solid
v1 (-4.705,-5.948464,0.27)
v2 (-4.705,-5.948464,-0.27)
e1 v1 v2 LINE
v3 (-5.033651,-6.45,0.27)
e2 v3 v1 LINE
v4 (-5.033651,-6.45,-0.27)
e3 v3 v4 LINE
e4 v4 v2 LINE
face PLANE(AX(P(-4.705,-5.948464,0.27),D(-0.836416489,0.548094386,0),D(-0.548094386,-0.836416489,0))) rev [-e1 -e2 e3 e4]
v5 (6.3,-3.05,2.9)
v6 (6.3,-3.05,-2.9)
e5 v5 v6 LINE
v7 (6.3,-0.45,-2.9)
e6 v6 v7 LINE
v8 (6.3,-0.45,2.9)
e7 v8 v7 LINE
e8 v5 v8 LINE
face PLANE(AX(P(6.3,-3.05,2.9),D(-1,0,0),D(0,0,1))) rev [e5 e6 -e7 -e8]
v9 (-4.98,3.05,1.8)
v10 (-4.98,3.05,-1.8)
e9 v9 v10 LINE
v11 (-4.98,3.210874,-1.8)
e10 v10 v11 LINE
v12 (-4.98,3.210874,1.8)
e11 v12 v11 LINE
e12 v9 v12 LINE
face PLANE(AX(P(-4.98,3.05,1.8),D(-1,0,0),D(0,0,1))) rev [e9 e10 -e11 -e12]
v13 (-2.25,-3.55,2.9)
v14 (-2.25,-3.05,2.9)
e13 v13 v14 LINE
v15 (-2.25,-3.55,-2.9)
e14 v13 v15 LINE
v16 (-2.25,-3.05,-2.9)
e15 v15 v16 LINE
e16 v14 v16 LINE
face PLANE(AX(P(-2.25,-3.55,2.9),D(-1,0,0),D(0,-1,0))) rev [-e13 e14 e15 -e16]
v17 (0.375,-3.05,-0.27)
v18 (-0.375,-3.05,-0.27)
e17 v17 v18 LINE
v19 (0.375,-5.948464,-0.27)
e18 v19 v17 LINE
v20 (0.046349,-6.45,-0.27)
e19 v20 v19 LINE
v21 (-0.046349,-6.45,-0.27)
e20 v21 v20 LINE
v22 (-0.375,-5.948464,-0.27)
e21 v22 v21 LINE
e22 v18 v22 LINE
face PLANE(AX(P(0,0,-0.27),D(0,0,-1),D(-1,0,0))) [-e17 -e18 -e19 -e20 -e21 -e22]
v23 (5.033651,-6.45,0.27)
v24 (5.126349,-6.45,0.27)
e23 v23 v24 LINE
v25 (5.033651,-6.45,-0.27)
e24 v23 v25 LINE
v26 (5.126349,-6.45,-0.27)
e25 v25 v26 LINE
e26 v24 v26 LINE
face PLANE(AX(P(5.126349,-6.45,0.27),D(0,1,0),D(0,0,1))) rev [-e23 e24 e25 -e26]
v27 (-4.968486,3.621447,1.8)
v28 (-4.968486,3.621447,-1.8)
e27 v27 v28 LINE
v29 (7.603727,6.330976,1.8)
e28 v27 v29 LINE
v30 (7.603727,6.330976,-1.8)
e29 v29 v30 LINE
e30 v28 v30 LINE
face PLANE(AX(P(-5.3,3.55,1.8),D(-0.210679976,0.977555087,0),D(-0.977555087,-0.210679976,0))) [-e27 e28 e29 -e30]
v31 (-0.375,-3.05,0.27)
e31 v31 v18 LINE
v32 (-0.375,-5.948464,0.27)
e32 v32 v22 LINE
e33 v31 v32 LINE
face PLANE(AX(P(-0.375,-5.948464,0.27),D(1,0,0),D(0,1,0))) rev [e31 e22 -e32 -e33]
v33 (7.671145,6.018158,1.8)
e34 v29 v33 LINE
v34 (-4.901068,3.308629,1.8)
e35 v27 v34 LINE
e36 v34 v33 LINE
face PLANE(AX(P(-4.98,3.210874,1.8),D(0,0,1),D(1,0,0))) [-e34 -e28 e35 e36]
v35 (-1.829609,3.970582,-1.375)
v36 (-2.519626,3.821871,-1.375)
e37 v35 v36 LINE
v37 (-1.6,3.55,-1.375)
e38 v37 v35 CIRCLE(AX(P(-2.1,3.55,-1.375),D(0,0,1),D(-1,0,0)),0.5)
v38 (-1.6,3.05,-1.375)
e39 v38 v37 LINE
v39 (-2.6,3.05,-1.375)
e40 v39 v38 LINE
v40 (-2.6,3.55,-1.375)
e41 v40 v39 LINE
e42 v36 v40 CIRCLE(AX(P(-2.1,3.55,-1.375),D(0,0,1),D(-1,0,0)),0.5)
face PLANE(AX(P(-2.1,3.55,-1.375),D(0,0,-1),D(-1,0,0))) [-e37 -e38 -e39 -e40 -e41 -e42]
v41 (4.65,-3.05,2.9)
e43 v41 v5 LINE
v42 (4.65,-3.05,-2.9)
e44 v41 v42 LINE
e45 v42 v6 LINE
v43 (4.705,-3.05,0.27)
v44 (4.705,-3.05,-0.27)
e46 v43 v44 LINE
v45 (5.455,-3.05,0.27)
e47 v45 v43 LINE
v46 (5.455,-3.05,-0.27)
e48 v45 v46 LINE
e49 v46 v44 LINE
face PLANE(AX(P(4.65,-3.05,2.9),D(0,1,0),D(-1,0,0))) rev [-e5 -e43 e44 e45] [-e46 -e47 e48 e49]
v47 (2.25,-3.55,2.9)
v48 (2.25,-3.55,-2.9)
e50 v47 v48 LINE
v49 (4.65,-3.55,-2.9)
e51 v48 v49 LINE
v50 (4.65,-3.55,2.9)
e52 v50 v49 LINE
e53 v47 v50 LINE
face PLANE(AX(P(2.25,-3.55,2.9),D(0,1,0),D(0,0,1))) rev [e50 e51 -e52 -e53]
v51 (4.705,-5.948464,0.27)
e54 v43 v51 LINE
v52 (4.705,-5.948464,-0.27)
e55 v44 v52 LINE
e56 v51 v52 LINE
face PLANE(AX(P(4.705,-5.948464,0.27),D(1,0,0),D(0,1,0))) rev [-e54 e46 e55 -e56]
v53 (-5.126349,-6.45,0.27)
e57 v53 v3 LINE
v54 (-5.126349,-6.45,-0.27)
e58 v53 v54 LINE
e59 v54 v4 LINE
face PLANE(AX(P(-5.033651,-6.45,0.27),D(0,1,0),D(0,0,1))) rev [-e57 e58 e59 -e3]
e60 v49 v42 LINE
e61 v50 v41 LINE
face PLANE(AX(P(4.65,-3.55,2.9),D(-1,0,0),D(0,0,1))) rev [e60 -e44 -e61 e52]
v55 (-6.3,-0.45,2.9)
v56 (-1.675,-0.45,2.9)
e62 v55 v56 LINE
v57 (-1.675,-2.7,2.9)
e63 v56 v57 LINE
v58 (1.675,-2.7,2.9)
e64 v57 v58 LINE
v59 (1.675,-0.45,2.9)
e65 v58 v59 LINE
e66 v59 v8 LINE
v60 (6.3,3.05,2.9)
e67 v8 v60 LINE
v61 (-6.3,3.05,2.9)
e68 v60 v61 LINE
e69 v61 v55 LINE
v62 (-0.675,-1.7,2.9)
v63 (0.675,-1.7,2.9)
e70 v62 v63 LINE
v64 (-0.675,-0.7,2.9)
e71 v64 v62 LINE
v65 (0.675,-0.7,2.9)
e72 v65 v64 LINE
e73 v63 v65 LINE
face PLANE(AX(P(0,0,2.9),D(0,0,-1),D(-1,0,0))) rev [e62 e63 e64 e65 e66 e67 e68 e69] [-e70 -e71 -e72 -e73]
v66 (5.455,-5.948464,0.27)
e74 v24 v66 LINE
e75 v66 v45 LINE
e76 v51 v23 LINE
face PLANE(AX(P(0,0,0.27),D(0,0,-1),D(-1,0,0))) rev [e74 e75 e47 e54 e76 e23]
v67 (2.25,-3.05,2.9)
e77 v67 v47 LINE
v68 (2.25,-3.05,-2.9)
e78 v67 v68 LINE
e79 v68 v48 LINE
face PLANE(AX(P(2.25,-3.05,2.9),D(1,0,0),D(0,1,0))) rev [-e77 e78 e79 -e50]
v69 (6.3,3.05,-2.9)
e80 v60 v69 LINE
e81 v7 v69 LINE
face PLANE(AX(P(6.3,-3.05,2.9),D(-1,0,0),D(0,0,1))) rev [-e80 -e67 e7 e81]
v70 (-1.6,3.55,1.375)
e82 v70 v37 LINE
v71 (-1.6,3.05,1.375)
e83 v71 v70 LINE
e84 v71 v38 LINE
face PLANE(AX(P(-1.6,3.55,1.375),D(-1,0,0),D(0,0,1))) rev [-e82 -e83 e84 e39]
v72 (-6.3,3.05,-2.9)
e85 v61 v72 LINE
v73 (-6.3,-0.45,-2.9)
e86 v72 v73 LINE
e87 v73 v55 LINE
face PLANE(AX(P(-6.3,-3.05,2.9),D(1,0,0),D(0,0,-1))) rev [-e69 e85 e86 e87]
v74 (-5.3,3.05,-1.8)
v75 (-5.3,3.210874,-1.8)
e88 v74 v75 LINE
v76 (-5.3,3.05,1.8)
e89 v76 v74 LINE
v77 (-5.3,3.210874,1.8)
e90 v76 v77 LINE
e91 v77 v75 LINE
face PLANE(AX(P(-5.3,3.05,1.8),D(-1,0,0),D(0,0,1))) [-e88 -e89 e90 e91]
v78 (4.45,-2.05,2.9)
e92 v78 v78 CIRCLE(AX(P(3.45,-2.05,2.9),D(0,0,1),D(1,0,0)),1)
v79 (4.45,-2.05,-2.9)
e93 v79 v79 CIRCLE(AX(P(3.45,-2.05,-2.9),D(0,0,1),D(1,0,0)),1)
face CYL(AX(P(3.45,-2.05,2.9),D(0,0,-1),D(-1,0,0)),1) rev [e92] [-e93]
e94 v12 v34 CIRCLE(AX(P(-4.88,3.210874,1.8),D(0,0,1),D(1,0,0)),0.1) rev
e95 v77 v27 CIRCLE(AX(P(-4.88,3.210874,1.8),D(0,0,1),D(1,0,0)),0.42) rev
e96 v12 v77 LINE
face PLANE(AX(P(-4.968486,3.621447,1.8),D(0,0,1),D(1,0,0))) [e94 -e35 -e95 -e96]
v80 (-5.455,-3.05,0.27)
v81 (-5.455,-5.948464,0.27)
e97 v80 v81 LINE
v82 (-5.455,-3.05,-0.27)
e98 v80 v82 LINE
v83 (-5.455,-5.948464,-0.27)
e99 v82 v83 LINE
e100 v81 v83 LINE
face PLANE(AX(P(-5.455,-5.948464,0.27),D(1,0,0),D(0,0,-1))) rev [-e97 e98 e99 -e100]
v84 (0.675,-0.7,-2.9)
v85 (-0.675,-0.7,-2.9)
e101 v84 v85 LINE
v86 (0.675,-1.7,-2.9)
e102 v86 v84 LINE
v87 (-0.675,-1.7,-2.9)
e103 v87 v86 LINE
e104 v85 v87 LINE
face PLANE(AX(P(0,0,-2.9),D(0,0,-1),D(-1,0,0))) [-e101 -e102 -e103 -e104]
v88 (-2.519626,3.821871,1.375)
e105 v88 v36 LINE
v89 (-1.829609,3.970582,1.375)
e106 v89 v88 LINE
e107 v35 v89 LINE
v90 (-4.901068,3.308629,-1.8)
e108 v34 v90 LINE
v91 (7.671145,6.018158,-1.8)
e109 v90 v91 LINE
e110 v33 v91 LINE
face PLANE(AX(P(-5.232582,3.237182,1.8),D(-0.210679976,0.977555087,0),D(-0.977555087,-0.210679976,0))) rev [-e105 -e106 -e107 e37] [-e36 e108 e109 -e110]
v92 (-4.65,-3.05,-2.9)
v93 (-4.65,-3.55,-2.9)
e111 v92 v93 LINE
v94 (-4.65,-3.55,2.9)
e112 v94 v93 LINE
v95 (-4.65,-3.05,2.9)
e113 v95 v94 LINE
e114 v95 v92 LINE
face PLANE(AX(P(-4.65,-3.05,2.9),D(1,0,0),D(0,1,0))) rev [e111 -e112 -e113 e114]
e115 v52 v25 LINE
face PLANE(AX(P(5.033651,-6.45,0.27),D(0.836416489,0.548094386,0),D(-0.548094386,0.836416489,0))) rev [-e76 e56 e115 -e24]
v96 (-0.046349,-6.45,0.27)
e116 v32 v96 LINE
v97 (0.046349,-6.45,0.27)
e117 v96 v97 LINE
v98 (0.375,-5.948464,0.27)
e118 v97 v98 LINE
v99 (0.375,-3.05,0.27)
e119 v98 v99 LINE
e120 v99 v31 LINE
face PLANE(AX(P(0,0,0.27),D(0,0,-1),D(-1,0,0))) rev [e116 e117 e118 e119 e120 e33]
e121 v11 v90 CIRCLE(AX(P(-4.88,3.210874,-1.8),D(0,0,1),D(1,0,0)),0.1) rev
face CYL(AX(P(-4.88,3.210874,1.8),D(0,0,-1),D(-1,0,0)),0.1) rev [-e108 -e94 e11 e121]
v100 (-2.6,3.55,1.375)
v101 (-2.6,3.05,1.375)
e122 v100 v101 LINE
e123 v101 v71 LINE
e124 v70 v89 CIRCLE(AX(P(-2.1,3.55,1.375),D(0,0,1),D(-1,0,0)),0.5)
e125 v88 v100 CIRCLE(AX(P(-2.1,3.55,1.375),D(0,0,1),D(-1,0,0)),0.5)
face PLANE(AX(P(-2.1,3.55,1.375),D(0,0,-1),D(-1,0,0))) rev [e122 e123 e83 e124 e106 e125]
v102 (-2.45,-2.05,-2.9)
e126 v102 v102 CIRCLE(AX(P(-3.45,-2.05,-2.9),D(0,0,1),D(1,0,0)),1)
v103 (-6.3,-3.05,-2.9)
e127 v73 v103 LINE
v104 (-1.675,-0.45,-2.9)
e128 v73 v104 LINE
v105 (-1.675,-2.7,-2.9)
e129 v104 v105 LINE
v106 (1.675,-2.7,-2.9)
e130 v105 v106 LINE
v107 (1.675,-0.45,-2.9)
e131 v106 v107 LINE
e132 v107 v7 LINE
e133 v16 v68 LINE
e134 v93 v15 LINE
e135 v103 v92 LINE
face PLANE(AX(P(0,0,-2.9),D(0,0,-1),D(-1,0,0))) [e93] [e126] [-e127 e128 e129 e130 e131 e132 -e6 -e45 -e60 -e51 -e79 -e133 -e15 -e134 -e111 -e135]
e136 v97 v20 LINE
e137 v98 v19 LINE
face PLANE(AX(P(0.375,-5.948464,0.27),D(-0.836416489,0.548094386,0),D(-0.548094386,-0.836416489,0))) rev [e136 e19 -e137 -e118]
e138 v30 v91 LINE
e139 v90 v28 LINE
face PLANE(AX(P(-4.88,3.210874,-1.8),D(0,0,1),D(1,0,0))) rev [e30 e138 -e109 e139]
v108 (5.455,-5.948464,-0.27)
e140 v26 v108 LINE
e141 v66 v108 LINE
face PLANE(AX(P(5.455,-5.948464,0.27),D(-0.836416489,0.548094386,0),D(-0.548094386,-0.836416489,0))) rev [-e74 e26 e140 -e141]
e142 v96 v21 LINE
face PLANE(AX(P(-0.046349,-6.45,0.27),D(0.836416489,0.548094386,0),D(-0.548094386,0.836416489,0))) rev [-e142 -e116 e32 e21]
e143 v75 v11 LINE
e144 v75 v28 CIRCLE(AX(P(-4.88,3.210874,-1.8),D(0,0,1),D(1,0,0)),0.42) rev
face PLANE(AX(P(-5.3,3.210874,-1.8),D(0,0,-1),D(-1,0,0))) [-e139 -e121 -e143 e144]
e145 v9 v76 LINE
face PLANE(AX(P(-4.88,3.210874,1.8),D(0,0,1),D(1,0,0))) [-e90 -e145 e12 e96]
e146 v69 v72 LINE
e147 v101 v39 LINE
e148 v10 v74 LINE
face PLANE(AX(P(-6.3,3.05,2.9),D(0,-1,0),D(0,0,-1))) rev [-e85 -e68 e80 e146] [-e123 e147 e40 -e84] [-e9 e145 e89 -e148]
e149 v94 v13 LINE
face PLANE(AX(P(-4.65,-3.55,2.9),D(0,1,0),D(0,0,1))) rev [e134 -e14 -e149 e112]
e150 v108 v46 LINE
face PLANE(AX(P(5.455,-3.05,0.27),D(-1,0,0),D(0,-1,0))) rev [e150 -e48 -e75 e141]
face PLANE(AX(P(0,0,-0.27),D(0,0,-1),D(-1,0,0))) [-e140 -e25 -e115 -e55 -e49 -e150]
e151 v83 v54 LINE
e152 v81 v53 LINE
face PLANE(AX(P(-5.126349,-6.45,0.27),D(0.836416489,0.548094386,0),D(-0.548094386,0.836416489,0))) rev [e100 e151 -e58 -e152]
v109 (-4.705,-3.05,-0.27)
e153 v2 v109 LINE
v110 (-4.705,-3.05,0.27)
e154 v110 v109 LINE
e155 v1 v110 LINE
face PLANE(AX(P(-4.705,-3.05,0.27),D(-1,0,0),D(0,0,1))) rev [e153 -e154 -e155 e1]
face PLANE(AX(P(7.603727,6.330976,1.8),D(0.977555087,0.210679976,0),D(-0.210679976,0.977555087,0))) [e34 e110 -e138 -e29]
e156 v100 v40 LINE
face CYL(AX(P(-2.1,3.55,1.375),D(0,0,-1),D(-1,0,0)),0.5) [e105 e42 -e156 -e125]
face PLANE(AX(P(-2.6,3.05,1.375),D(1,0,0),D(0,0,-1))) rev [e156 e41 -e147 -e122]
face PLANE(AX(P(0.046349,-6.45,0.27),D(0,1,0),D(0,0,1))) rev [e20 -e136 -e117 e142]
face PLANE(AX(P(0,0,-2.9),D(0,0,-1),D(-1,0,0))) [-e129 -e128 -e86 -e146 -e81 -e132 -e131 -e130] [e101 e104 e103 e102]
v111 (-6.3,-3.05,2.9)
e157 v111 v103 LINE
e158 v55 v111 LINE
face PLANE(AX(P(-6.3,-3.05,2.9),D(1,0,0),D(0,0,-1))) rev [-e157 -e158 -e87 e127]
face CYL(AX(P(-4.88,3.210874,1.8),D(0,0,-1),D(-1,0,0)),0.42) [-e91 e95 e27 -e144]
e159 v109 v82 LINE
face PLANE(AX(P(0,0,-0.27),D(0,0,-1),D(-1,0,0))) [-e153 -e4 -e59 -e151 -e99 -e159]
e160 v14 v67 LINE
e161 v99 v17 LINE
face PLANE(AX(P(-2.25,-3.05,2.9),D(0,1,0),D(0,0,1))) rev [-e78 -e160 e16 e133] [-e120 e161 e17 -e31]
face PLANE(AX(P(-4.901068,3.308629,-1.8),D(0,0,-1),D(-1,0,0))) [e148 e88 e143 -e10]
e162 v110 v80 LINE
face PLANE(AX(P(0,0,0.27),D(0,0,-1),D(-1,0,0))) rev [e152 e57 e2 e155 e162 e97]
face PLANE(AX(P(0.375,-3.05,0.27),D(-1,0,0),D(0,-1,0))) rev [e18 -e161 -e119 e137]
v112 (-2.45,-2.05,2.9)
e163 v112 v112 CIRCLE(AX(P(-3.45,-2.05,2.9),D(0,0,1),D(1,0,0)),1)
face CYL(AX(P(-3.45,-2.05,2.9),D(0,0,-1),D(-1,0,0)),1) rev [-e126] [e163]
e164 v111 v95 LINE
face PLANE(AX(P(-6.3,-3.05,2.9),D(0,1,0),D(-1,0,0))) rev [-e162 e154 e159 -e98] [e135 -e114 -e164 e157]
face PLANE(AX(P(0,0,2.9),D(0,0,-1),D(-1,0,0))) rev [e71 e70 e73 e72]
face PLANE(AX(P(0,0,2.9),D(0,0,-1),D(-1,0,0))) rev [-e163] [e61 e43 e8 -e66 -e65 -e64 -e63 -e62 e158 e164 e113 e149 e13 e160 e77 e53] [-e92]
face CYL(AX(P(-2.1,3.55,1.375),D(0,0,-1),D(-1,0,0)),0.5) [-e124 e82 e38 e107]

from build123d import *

# Parameters (mm, degrees)
SKETCH2_R           = 1
BODY_DEPTH          = 2.9
LEVER_DEPTH         = 1.8
LEGS_DEPTH          = 0.27
BOSS_EXTRUDE3_DEPTH = 1.375


# Sheet-metal steps are written as plain solids
with BuildPart() as part:
    # Sketch2 → Body (new, symmetric)
    with BuildSketch(Plane.XY):
        Polygon((-6.3, -3.05), (-4.65, -3.05), (-4.65, -3.55), (-2.25, -3.55), (-2.25, -3.05), (2.25, -3.05), (2.25, -3.55), (4.65, -3.55), (4.65, -3.05), (6.3, -3.05), (6.3, 3.05), (-6.3, 3.05), align=None)
        with Locations((-3.45, -2.05)):
            Circle(SKETCH2_R, mode=Mode.SUBTRACT)
        with Locations((3.45, -2.05)):
            Circle(SKETCH2_R, mode=Mode.SUBTRACT)
    extrude(amount=BODY_DEPTH, both=True)

    # Sketch8 → Legs (add, symmetric)
    with BuildSketch(Plane.XY):
        Polygon((-4.705, -3.05), (-5.455, -3.05), (-5.455, -5.94846389), (-5.126348987, -6.45), (-5.033651013, -6.45), (-4.705, -5.94846389), align=None)
        Polygon((0.375, -3.05), (-0.375, -3.05), (-0.375, -5.94846389), (-0.046348987, -6.45), (0.046348987, -6.45), (0.375, -5.94846389), align=None)
        Polygon((5.455, -3.05), (4.705, -3.05), (4.705, -5.94846389), (5.033651013, -6.45), (5.126348987, -6.45), (5.455, -5.94846389), align=None)
    extrude(amount=LEGS_DEPTH, both=True)



with BuildPart() as body_2:
    # Sketch3 → Lever (new, symmetric)
    with BuildSketch(Plane.XY):
        with BuildLine():
            Line((-5.3, 3.05), (-5.3, 3.210873935))
            ThreePointArc((-5.3, 3.210873935), (-5.206775112, 3.474726216), (-4.96848559, 3.621447071))
            Line((-4.96848559, 3.621447071), (7.603727147, 6.330975678))
            Line((7.603727147, 6.330975678), (7.671144739, 6.01815805))
            Line((7.671144739, 6.01815805), (-4.901067998, 3.308629443))
            ThreePointArc((-4.901067998, 3.308629443), (-4.957803598, 3.273695906), (-4.98, 3.210873935))
            Line((-4.98, 3.210873935), (-4.98, 3.05))
            Line((-4.98, 3.05), (-5.3, 3.05))
        make_face()
    extrude(amount=LEVER_DEPTH, both=True)


with BuildPart() as part_1:
    add(part.part)

    add(body_2.part)  # Boss-Extrude3 merges body 2
    # Sketch9 → Boss-Extrude3 (add, symmetric)
    with BuildSketch(Plane.XY):
        with BuildLine():
            Line((-2.6, 3.05), (-2.6, 3.55))
            ThreePointArc((-2.6, 3.55), (-2.1, 4.05), (-1.6, 3.55))
            Line((-1.6, 3.55), (-1.6, 3.05))
            Line((-1.6, 3.05), (-2.6, 3.05))
        make_face()
    extrude(amount=BOSS_EXTRUDE3_DEPTH, both=True)


solid = part_1.part
